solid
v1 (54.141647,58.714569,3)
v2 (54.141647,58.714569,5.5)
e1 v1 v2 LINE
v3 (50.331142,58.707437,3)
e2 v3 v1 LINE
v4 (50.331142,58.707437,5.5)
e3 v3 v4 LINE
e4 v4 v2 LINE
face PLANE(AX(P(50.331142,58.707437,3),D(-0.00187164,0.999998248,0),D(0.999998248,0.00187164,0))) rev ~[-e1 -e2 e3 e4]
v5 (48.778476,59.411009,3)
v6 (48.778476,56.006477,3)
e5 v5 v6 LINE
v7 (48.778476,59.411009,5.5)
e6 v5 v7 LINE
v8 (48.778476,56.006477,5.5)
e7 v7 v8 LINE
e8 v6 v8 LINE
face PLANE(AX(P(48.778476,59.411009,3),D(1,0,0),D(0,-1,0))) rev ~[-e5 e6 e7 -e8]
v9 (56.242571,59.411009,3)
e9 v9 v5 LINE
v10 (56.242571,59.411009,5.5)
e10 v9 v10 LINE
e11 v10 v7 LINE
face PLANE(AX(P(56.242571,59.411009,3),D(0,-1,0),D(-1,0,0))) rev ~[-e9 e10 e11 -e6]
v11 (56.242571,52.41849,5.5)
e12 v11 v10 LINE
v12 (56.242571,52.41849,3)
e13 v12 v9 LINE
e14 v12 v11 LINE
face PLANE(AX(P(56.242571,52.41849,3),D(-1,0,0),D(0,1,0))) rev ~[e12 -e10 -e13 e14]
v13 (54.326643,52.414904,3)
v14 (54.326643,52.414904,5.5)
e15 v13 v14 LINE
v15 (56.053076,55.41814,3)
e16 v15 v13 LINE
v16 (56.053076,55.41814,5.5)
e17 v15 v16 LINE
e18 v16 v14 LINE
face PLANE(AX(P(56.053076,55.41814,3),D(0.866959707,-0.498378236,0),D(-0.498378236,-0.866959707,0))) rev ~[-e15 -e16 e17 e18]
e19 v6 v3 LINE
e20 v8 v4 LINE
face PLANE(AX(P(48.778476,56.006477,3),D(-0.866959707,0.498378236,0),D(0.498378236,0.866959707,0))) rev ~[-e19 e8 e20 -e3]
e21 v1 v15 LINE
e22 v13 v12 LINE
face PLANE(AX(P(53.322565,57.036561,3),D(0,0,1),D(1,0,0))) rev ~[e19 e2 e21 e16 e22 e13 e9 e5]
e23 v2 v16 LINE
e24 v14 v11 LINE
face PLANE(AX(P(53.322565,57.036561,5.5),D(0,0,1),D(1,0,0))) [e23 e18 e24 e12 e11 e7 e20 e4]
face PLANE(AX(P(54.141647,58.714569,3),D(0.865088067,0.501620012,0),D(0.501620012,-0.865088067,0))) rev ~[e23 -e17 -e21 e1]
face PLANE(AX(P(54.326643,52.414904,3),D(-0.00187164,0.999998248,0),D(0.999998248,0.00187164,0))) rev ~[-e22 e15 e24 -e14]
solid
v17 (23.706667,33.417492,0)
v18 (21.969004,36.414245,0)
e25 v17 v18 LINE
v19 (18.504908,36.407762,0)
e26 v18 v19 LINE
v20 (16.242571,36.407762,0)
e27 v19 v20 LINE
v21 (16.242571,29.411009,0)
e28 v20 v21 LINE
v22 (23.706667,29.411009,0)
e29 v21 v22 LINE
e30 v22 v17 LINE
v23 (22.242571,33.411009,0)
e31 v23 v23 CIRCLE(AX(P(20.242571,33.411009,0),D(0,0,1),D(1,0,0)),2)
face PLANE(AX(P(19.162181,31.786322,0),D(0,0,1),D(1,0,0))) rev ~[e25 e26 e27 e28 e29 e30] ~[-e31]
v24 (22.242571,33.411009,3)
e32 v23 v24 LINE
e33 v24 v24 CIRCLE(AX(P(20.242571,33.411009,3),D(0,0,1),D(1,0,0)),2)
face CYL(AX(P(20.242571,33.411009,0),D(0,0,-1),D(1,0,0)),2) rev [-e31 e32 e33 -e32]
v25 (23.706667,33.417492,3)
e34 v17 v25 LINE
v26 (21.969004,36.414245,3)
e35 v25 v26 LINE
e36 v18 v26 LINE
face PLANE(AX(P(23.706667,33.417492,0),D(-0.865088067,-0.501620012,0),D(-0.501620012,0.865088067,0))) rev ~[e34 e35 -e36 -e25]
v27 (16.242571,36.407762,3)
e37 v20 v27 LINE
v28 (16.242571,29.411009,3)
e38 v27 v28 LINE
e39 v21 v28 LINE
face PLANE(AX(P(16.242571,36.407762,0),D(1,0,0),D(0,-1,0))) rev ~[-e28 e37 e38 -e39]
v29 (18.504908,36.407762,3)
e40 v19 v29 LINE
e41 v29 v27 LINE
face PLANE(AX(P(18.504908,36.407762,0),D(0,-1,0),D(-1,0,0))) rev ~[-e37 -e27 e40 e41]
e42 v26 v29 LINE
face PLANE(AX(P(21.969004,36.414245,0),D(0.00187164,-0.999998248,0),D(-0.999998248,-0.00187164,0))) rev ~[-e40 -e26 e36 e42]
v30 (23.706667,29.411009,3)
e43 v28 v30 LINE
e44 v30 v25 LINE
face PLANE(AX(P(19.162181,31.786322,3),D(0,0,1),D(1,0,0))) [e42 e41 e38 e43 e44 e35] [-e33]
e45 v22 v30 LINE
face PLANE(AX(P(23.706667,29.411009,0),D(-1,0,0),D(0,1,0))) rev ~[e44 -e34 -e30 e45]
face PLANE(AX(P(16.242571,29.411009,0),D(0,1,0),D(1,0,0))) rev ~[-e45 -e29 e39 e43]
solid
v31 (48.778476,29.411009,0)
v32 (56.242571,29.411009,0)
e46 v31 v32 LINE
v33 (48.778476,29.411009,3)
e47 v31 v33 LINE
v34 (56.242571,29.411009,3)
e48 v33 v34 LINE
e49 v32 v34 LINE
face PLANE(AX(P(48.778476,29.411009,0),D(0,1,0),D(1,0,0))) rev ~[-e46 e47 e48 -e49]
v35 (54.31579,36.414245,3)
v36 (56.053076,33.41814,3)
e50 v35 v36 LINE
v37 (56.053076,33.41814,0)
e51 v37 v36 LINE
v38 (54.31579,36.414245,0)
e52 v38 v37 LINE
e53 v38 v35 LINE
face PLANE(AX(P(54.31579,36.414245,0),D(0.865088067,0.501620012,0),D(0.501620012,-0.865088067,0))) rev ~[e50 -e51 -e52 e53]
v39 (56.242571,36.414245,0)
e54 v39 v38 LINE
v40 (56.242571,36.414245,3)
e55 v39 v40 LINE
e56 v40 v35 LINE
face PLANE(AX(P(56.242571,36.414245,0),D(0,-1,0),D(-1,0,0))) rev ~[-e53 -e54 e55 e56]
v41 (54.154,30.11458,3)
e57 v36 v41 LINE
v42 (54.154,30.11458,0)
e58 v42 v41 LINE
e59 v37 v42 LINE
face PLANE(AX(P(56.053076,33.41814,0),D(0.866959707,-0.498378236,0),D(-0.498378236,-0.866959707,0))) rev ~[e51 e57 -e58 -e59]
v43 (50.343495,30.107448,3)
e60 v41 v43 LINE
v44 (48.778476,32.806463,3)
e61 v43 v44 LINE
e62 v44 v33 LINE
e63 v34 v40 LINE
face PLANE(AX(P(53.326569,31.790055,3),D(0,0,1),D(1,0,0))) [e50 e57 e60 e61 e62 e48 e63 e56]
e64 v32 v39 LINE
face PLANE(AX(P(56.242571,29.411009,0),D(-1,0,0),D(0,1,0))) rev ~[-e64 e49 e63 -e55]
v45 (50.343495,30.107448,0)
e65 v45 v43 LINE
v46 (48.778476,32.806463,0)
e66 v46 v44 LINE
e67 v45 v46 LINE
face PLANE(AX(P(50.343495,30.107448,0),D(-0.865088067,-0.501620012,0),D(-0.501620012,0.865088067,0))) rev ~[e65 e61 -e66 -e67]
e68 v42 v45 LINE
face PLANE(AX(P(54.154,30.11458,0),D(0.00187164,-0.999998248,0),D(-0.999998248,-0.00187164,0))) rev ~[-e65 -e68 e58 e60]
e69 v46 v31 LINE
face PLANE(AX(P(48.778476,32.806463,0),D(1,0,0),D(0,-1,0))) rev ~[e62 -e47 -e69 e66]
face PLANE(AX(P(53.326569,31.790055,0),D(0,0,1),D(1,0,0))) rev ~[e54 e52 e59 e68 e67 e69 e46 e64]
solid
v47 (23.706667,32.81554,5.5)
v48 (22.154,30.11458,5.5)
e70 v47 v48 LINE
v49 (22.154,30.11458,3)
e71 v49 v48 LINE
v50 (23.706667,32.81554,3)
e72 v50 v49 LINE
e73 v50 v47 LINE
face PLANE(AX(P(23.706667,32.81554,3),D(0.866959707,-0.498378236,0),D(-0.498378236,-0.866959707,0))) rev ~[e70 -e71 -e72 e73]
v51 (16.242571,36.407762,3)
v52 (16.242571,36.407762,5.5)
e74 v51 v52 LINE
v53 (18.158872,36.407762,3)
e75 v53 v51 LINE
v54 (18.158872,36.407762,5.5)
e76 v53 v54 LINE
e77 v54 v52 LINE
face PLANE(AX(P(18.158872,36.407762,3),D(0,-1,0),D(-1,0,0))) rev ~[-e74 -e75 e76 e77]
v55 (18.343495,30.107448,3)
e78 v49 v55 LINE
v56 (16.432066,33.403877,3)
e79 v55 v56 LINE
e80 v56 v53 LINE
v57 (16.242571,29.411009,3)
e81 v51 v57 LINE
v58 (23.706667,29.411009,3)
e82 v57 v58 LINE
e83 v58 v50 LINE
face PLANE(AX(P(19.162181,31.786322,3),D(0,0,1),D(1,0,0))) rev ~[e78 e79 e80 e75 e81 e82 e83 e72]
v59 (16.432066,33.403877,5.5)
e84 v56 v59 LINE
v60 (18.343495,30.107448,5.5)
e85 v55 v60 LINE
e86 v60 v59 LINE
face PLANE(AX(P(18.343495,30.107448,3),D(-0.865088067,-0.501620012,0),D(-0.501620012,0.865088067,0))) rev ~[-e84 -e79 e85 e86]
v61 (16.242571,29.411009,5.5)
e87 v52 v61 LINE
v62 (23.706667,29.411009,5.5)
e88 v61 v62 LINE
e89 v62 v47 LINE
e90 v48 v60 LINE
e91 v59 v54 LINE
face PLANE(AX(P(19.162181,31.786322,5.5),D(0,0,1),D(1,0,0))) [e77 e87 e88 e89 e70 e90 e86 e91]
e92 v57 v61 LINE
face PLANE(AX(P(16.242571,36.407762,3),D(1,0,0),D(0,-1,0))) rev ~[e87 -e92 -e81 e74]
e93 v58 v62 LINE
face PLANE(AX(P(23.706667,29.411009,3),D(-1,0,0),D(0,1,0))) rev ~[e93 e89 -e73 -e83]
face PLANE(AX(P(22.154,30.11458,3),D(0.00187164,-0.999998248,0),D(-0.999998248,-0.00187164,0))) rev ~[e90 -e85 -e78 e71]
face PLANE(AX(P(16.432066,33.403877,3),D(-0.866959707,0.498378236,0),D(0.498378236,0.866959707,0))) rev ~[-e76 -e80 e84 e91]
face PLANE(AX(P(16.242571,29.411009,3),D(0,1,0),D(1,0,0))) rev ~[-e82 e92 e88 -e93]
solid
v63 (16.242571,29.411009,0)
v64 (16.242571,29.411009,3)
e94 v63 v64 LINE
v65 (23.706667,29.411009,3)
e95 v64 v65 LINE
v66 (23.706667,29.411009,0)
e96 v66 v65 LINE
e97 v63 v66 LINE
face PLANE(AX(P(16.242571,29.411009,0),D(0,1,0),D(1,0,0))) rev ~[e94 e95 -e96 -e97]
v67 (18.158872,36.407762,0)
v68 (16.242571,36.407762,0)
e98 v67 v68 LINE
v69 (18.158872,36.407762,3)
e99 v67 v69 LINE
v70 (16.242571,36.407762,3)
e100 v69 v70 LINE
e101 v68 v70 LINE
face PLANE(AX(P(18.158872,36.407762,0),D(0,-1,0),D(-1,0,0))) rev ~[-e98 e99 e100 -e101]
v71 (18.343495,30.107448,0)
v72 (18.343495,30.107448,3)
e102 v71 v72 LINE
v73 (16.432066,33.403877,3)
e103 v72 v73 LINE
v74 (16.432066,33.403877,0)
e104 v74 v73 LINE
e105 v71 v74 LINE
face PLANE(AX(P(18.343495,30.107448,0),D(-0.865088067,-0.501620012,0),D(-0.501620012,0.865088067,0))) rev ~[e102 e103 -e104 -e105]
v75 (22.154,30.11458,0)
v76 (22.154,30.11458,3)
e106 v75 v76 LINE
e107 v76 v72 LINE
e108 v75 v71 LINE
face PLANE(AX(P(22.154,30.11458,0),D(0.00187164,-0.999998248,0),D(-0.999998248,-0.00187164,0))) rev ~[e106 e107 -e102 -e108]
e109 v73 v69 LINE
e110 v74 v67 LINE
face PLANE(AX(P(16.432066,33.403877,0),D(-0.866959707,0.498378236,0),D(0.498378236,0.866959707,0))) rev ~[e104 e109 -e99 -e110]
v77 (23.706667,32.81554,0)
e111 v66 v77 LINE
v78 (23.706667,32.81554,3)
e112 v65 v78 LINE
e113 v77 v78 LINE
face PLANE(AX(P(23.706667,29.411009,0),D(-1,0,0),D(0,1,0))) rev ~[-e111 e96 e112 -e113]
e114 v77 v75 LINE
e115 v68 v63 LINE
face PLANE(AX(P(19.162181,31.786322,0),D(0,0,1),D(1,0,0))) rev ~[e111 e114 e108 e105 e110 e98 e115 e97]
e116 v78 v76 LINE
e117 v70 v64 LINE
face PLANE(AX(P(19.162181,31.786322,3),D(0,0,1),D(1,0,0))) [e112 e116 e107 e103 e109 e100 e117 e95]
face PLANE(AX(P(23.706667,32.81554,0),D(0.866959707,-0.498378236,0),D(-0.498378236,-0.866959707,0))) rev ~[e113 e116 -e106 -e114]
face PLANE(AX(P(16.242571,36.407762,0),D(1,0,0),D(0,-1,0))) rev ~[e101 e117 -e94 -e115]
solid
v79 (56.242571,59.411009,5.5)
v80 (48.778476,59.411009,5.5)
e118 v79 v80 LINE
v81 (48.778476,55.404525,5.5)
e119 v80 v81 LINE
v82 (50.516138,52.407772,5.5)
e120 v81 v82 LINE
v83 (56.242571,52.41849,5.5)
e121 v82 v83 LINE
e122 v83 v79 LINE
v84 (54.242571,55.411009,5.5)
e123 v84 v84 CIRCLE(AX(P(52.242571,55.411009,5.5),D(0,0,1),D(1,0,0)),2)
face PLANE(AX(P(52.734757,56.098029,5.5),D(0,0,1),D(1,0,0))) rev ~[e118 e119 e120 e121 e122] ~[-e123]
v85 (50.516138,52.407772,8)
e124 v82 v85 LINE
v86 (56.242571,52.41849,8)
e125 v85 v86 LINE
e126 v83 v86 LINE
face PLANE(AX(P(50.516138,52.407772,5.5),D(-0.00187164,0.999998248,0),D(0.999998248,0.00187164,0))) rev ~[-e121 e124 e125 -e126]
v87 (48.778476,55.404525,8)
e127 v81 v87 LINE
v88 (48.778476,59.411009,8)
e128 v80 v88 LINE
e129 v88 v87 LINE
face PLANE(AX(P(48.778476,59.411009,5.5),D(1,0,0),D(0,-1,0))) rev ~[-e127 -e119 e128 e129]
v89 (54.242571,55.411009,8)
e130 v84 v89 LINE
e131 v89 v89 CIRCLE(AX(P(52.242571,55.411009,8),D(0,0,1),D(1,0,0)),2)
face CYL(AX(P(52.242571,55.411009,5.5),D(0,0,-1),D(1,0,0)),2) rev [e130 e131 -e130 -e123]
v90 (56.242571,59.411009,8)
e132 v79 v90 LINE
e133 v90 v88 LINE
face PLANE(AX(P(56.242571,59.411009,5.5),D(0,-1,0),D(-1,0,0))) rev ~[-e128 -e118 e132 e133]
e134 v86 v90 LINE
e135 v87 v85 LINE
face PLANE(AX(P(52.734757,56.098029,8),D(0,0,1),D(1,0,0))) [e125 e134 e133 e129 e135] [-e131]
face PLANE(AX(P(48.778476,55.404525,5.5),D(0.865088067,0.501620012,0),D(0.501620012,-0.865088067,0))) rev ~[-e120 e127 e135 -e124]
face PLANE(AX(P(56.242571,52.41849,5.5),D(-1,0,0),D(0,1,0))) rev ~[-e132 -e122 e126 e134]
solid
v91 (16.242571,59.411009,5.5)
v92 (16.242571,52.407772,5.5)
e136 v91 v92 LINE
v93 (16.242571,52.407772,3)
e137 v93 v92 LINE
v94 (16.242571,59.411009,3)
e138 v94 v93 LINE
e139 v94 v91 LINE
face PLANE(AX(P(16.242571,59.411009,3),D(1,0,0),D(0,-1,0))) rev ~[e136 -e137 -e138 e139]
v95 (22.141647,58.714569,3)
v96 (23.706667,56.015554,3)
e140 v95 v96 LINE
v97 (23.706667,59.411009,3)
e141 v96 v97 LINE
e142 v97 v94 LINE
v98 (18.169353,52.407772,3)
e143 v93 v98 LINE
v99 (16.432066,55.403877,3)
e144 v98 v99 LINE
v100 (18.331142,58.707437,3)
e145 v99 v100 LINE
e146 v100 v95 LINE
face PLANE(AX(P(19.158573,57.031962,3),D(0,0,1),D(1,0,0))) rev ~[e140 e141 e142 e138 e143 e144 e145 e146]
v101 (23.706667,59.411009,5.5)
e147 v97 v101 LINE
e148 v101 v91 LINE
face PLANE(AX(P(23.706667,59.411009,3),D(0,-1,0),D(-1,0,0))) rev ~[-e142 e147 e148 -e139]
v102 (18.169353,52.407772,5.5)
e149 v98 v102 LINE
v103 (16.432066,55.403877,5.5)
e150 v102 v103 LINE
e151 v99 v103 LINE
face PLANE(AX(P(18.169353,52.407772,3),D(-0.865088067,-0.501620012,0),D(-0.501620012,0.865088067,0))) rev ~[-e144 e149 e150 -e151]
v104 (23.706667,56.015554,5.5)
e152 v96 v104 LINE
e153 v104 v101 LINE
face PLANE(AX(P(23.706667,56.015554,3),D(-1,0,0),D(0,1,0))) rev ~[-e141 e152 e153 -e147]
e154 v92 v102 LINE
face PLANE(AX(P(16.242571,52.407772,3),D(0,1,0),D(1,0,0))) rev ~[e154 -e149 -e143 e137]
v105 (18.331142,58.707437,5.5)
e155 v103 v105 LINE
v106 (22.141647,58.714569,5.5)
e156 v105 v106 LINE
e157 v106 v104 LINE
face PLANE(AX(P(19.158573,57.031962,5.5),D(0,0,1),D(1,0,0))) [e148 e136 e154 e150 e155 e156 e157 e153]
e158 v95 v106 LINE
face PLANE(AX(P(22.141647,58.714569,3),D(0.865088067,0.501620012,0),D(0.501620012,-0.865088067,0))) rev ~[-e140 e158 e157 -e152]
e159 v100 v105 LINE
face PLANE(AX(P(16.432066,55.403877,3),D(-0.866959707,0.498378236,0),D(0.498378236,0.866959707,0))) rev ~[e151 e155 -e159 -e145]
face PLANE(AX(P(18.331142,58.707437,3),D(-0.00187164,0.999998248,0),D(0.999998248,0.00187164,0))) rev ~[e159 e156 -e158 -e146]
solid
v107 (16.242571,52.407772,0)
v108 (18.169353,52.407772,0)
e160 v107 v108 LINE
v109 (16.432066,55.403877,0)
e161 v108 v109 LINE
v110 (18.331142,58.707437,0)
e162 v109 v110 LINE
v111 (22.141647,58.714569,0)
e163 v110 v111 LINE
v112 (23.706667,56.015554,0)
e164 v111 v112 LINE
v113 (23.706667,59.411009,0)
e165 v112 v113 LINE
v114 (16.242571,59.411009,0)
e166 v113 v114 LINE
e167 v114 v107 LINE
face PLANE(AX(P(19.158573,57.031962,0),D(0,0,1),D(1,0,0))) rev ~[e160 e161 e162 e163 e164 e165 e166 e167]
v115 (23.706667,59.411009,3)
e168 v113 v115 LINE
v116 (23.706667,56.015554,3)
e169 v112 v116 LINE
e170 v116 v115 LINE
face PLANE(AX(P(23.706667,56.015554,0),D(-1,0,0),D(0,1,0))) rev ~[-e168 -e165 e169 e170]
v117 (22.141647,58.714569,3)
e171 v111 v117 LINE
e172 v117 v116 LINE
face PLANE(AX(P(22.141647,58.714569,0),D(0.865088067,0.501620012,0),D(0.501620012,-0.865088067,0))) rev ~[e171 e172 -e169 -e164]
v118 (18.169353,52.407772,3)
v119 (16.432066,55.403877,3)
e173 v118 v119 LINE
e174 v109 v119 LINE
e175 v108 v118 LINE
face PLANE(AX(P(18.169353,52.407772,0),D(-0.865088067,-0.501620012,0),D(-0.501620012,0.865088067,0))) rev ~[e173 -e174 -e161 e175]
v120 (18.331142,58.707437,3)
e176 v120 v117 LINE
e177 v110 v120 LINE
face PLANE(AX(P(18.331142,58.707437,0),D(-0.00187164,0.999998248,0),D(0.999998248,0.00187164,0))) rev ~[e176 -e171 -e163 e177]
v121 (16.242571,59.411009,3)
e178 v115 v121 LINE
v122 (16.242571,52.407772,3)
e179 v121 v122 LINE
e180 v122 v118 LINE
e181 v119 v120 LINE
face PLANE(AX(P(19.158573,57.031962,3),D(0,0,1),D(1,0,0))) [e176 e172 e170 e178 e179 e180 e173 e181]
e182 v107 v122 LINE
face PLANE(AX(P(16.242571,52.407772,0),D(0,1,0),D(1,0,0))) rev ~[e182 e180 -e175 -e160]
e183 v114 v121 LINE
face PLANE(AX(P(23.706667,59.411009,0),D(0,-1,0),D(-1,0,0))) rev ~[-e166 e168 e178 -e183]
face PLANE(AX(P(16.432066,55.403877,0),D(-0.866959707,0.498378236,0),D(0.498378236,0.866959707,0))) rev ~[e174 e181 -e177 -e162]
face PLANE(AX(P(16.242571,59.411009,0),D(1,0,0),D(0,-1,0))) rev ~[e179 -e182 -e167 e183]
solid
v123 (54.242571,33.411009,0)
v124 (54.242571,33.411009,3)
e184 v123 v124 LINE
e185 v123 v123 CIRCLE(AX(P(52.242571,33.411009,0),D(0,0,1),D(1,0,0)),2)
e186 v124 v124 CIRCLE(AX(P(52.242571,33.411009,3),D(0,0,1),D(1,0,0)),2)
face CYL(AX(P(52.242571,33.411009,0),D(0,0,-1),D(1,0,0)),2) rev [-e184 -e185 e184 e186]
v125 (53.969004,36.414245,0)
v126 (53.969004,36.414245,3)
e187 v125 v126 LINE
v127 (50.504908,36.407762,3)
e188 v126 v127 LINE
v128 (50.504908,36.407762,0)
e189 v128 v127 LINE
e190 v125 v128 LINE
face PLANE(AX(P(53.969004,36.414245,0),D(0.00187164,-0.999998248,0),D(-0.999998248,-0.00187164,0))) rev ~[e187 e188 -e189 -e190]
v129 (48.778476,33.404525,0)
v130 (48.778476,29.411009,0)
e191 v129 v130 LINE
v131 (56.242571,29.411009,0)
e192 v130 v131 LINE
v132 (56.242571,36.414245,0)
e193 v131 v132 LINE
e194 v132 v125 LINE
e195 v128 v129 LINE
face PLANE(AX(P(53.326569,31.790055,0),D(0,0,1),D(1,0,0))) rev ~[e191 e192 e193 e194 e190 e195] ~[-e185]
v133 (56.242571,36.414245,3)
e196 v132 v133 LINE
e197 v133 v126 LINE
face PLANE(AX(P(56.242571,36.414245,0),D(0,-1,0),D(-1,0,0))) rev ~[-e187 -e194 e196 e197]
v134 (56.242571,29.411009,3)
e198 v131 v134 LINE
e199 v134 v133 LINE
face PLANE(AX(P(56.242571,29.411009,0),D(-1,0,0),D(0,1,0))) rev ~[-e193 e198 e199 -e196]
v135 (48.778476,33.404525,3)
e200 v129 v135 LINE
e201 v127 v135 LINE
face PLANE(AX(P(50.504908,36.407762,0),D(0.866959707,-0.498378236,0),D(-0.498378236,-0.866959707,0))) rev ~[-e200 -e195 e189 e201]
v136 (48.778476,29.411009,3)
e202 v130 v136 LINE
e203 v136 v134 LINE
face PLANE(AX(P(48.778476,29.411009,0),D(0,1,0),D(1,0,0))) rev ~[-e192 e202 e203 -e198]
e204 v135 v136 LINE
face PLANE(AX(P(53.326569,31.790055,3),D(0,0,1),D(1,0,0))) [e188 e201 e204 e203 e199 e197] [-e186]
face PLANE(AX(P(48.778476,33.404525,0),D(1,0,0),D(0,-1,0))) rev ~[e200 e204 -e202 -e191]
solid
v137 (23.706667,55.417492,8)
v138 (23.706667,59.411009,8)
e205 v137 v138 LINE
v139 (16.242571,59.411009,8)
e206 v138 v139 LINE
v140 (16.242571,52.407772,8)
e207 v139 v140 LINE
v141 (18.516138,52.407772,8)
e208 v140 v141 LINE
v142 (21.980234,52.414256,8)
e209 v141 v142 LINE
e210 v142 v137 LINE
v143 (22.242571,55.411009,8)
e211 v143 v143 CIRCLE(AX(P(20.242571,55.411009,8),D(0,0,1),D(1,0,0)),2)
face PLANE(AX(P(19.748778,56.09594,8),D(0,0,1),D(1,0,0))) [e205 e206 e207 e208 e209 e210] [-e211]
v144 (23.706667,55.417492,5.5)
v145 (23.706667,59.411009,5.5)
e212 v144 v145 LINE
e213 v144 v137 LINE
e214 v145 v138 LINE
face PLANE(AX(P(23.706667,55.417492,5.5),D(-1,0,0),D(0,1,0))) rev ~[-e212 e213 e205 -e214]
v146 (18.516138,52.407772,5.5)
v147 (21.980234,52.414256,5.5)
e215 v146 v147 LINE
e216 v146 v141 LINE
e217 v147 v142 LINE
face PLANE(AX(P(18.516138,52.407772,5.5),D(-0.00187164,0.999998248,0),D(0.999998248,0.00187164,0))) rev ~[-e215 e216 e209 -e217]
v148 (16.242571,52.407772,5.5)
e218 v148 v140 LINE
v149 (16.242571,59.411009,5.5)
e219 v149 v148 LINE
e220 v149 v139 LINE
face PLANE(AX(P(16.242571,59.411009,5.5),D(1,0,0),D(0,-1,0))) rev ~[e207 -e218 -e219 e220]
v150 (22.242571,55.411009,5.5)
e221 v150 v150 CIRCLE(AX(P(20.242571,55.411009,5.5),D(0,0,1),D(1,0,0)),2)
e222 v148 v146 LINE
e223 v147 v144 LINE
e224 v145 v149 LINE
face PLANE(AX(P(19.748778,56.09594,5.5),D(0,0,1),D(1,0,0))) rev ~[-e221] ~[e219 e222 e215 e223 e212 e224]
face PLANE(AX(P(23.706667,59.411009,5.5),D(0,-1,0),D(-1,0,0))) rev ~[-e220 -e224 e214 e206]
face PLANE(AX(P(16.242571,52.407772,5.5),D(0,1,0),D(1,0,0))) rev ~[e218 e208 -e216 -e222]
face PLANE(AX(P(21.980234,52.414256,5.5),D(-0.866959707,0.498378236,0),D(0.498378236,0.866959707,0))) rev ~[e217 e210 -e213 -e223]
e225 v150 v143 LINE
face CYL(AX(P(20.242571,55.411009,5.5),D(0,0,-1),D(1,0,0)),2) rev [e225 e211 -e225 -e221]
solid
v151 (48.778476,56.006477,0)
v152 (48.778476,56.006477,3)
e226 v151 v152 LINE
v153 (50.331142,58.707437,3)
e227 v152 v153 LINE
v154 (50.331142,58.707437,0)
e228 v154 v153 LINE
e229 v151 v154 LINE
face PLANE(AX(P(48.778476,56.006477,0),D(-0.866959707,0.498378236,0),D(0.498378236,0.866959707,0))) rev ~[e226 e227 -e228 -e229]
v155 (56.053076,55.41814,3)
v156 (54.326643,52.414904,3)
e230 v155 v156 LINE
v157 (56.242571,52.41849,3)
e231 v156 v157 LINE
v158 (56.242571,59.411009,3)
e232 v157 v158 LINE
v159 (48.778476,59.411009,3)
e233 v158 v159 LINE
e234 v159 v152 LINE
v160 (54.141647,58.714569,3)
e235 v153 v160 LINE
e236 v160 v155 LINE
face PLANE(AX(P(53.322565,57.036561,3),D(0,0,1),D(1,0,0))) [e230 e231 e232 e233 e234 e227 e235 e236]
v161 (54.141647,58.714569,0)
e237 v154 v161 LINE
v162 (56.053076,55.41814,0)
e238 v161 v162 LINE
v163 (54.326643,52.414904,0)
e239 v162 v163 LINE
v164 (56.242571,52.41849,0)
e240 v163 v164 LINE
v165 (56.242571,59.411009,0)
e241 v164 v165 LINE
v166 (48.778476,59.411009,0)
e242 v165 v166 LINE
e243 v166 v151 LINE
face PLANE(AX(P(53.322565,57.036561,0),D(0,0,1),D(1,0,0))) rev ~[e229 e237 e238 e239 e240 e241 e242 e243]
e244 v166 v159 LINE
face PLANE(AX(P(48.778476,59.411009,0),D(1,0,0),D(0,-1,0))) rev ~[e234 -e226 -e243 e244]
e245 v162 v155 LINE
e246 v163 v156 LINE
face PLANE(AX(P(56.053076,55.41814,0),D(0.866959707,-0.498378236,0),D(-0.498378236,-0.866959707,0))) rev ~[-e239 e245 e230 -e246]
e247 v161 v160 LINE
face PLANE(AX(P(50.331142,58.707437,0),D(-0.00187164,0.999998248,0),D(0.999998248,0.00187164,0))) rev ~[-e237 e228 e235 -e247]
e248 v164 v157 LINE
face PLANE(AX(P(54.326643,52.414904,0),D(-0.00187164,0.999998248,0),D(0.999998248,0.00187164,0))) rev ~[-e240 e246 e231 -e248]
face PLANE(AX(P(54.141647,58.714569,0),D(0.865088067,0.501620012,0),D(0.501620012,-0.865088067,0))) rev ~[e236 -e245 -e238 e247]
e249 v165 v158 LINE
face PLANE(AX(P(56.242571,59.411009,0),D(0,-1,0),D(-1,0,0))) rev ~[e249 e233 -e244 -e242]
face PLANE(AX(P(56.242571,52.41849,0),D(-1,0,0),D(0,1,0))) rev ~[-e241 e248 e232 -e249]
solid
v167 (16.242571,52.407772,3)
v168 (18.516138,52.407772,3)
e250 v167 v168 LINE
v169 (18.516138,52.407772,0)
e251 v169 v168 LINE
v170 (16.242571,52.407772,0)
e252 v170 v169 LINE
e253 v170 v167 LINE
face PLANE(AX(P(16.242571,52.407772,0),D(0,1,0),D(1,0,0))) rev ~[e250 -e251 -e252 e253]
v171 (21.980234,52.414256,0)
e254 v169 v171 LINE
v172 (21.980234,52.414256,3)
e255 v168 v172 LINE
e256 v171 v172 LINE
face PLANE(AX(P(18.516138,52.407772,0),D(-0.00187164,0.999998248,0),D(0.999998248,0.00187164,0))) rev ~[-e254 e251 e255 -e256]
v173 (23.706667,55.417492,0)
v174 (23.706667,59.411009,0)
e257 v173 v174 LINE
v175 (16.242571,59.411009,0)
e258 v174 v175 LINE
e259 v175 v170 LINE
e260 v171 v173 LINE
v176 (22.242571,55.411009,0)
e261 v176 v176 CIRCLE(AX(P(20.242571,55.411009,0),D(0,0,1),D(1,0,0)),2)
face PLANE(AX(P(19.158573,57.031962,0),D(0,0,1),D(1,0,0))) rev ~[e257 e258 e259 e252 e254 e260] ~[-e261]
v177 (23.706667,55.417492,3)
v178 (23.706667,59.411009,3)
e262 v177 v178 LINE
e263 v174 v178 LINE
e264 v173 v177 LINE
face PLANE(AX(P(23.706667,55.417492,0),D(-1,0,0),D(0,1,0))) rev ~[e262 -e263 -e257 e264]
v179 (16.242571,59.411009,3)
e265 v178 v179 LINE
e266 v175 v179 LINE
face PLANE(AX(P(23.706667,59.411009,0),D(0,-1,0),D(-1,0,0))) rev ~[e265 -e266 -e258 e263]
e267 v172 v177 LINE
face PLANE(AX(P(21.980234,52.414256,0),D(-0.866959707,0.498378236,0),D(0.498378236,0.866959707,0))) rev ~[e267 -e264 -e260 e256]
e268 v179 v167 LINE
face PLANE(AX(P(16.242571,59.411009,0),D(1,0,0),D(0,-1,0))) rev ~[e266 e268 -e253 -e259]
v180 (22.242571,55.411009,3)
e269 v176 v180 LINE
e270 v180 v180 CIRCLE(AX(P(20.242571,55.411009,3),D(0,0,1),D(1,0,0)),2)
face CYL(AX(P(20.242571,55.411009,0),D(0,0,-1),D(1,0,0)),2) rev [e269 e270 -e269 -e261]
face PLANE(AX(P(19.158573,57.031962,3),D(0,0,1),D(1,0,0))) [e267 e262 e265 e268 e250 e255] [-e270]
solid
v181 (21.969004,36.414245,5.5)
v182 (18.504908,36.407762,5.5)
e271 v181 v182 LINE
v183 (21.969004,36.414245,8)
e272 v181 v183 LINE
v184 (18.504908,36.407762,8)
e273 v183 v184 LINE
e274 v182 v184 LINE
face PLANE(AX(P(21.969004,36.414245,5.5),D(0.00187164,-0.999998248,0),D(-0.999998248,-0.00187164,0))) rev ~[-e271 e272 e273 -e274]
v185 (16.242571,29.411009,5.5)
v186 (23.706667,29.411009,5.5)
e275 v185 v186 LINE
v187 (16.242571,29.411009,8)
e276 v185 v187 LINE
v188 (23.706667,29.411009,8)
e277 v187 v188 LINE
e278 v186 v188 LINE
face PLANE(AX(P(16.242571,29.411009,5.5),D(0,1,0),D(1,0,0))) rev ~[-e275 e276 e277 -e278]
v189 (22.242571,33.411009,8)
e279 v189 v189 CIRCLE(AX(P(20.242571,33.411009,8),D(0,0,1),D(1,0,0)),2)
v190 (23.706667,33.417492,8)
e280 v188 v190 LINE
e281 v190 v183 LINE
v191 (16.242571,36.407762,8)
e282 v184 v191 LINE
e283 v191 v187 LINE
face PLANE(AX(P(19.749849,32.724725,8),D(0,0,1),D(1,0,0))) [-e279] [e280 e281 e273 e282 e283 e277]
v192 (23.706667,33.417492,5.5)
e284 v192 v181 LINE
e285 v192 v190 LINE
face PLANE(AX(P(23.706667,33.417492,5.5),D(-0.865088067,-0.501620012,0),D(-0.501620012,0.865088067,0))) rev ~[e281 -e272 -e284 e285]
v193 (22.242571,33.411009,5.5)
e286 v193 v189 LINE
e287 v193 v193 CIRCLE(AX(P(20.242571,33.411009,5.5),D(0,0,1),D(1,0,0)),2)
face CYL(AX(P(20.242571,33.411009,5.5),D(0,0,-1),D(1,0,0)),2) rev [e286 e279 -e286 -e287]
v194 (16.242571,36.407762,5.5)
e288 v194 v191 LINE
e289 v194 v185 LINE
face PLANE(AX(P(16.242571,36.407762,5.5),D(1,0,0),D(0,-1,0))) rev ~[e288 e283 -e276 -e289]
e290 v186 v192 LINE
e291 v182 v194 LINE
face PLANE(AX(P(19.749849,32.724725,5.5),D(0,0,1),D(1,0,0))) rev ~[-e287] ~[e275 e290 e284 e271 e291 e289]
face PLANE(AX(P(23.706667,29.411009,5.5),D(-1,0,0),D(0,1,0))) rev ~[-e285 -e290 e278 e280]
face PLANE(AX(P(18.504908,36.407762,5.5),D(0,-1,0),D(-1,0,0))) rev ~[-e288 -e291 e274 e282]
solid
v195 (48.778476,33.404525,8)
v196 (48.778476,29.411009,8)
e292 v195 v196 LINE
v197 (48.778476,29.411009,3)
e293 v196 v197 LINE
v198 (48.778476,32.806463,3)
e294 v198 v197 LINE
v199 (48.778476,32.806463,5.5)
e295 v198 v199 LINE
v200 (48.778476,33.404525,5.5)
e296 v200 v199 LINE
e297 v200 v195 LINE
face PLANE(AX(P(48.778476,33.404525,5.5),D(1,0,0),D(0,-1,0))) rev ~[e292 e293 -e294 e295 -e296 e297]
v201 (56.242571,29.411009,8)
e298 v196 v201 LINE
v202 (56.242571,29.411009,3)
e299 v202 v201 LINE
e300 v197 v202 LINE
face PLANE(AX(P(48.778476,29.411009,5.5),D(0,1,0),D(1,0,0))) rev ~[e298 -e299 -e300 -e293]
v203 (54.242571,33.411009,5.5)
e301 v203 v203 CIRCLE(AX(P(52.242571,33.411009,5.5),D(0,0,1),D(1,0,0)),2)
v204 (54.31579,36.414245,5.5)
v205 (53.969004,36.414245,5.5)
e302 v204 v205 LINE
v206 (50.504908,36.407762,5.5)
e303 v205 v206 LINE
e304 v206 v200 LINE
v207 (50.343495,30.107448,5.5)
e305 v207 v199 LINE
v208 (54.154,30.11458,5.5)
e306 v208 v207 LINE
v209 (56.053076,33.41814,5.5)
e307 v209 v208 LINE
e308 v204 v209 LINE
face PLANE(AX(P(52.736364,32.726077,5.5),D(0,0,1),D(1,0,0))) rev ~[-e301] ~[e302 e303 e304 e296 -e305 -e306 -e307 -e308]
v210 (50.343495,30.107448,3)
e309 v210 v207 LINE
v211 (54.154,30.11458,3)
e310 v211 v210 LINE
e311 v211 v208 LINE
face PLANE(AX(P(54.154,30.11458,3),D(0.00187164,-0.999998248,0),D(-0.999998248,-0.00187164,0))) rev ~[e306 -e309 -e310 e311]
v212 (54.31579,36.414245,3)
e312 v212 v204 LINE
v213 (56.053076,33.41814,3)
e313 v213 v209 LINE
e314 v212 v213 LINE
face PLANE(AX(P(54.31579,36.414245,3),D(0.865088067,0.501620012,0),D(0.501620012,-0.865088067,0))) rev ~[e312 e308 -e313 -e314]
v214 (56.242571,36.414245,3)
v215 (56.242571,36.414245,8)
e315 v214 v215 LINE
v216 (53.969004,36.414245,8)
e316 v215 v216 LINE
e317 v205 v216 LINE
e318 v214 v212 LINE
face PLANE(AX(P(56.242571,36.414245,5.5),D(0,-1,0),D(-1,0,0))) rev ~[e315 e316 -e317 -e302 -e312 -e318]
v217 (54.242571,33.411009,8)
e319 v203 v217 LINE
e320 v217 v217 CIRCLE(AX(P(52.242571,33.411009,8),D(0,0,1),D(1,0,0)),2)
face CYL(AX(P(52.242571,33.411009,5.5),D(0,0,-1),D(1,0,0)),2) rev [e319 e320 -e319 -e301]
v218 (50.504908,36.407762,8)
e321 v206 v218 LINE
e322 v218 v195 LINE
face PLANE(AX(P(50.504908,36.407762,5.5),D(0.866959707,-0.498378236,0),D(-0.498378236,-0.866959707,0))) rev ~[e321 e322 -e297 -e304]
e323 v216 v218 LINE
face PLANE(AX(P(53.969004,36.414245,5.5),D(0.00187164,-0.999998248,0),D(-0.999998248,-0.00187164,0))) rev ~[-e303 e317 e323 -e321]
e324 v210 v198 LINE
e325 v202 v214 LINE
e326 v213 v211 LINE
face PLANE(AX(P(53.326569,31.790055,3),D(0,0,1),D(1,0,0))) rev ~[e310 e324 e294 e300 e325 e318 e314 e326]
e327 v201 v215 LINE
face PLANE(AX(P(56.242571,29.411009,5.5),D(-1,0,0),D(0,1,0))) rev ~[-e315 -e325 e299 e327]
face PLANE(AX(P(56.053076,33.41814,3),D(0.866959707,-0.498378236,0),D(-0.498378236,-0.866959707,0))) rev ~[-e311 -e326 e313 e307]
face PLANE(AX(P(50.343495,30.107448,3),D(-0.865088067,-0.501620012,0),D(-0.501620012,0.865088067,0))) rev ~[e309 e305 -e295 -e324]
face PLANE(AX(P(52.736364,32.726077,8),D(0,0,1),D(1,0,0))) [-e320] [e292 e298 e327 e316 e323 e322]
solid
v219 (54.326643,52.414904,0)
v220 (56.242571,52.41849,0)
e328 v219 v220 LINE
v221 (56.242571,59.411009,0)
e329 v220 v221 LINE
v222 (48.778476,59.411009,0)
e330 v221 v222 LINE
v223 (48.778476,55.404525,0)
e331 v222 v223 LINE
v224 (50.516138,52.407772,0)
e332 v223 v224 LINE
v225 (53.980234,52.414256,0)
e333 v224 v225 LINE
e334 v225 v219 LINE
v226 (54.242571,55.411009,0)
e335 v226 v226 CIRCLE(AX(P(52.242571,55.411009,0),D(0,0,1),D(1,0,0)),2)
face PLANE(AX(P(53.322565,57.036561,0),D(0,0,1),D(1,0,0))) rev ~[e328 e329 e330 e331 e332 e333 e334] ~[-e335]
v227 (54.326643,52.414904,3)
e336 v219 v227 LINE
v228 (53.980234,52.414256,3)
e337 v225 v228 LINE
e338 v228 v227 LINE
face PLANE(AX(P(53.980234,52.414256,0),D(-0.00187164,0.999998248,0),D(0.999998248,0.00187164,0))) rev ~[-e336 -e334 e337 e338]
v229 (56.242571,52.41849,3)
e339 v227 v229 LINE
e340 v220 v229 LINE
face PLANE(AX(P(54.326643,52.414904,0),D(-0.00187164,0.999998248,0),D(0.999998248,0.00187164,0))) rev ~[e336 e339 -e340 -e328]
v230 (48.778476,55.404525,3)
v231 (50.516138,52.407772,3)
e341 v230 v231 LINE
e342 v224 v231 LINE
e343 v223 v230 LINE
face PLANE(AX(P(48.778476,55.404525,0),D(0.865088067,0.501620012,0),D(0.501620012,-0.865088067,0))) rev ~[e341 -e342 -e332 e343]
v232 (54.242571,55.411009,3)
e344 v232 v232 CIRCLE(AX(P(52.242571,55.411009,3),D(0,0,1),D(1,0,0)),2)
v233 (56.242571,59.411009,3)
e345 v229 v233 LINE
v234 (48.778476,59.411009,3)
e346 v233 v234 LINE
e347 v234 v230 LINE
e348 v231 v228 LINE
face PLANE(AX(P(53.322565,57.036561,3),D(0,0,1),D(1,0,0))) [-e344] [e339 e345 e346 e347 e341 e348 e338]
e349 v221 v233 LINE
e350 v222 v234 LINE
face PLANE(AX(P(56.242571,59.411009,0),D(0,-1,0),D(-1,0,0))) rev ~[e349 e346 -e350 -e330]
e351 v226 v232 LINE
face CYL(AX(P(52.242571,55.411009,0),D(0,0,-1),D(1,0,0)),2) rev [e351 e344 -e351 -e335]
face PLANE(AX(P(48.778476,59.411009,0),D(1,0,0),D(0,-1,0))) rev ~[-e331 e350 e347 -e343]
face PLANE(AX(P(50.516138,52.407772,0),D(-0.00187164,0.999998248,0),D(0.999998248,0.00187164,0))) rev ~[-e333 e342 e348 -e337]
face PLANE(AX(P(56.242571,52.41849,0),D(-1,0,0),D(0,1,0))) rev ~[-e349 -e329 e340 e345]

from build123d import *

# Parameters (mm, degrees)
F0_R      = 2
F1_DEPTH  = 3
F2_DEPTH  = 3
F3_DEPTH  = 2.5
F4_START  = 2.5
F1_FACE_R = 2
F4_DEPTH  = 2.5


with BuildPart() as f1:
    # F0 (on Top) → F1 (new body)
    with BuildSketch(Plane.XY):
        Polygon((56.2425711751, 29.4110085815), (56.2425711751, 36.414245103), (54.3157895307, 36.414245103), (56.0530762776, 33.4181404888), (54.1540001392, 30.1145803152), (50.3434950368, 30.1074484079), (48.7784756274, 32.8064627658), (48.7784756274, 29.4110085815), align=None)
        Polygon((56.0530762776, 33.4181404888), (54.3157895307, 36.414245103), (53.9690040281, 36.414245103), (50.5049084804, 36.4077615509), (48.7784756274, 33.4045250294), (48.7784756274, 32.8064627658), (50.3434950368, 30.1074484079), (54.1540001392, 30.1145803152), align=None)
        with Locations((52.2425711751, 33.4110085815)):
            Circle(F0_R, mode=Mode.SUBTRACT)
    extrude(amount=F1_DEPTH)


with BuildPart() as f1b:
    # F0 (on Top) → F1, piece 2 (new body)
    with BuildSketch(Plane.XY):
        Polygon((18.1588716375, 36.4077615509), (16.2425711751, 36.4077615509), (16.2425711751, 29.4110085815), (23.7066667228, 29.4110085815), (23.7066667228, 32.8155396842), (22.1540001392, 30.1145803152), (18.3434950368, 30.1074484079), (16.4320660726, 33.4038766742), align=None)
        Polygon((18.5049084804, 36.4077615509), (18.1588716375, 36.4077615509), (16.4320660726, 33.4038766742), (18.3434950368, 30.1074484079), (22.1540001392, 30.1145803152), (23.7066667228, 32.8155396842), (23.7066667228, 33.4174921336), (21.9690040281, 36.414245103), align=None)
        with Locations((20.2425711751, 33.4110085815)):
            Circle(F0_R, mode=Mode.SUBTRACT)
    extrude(amount=F1_DEPTH)


with BuildPart() as f1c:
    # F0 (on Top) → F1, piece 3 (new body)
    with BuildSketch(Plane.XY):
        Polygon((23.7066667228, 59.4110085815), (16.2425711751, 59.4110085815), (16.2425711751, 52.40777206), (18.1693528195, 52.40777206), (16.4320660726, 55.4038766742), (18.331142211, 58.7074368479), (22.1416473134, 58.7145687551), (23.7066667228, 56.0155543972), align=None)
        Polygon((23.7066667228, 55.4174921336), (23.7066667228, 56.0155543972), (22.1416473134, 58.7145687551), (18.331142211, 58.7074368479), (16.4320660726, 55.4038766742), (18.1693528195, 52.40777206), (18.5161383221, 52.40777206), (21.9802338698, 52.4142556121), align=None)
        with Locations((20.2425711751, 55.4110085815)):
            Circle(F0_R, mode=Mode.SUBTRACT)
    extrude(amount=F1_DEPTH)


with BuildPart() as f1d:
    # F0 (on Top) → F1, piece 4 (new body)
    with BuildSketch(Plane.XY):
        Polygon((56.2425711751, 59.4110085815), (48.7784756274, 59.4110085815), (48.7784756274, 56.0064774788), (50.331142211, 58.7074368479), (54.1416473134, 58.7145687551), (56.0530762776, 55.4181404888), (54.3266434245, 52.4149039673), (56.2425711751, 52.4184899011), align=None)
        Polygon((50.331142211, 58.7074368479), (48.7784756274, 56.0064774788), (48.7784756274, 55.4045250294), (50.5161383221, 52.40777206), (53.9802338698, 52.4142556121), (54.3266434245, 52.4149039673), (56.0530762776, 55.4181404888), (54.1416473134, 58.7145687551), align=None)
        with Locations((52.2425711751, 55.4110085815)):
            Circle(F0_R, mode=Mode.SUBTRACT)
    extrude(amount=F1_DEPTH)


with BuildPart() as f2:
    # F0 (on Top) → F2 (new body, through all)
    with BuildSketch(Plane.XY):
        Polygon((56.2425711751, 29.4110085815), (56.2425711751, 36.414245103), (54.3157895307, 36.414245103), (56.0530762776, 33.4181404888), (54.1540001392, 30.1145803152), (50.3434950368, 30.1074484079), (48.7784756274, 32.8064627658), (48.7784756274, 29.4110085815), align=None)
    extrude(amount=F2_DEPTH)


with BuildPart() as f2b:
    # F0 (on Top) → F2, piece 2 (new body, through all)
    with BuildSketch(Plane.XY):
        Polygon((56.2425711751, 59.4110085815), (48.7784756274, 59.4110085815), (48.7784756274, 56.0064774788), (50.331142211, 58.7074368479), (54.1416473134, 58.7145687551), (56.0530762776, 55.4181404888), (54.3266434245, 52.4149039673), (56.2425711751, 52.4184899011), align=None)
    extrude(amount=F2_DEPTH)


with BuildPart() as f2c:
    # F0 (on Top) → F2, piece 3 (new body, through all)
    with BuildSketch(Plane.XY):
        Polygon((23.7066667228, 59.4110085815), (16.2425711751, 59.4110085815), (16.2425711751, 52.40777206), (18.1693528195, 52.40777206), (16.4320660726, 55.4038766742), (18.331142211, 58.7074368479), (22.1416473134, 58.7145687551), (23.7066667228, 56.0155543972), align=None)
    extrude(amount=F2_DEPTH)


with BuildPart() as f2d:
    # F0 (on Top) → F2, piece 4 (new body, through all)
    with BuildSketch(Plane.XY):
        Polygon((18.1588716375, 36.4077615509), (16.2425711751, 36.4077615509), (16.2425711751, 29.4110085815), (23.7066667228, 29.4110085815), (23.7066667228, 32.8155396842), (22.1540001392, 30.1145803152), (18.3434950368, 30.1074484079), (16.4320660726, 33.4038766742), align=None)
    extrude(amount=F2_DEPTH)


with BuildPart() as f3:
    # F3 (new): a face of the model
    f3_faces = [f2.part.faces().sort_by_distance(p)[0] for p in [
        (52.5105234013, 29.5133599587, 3),
    ]]
    extrude(f3_faces, amount=F3_DEPTH)

    # F1_face (on face) → F4 (join)
    with BuildSketch(Plane(origin=(52.8230493213, 32.5673462874, 3), x_dir=(1, 0, 0), z_dir=(0, 0, 1)).offset(F4_START)):
        Polygon((-4.0445736939, -3.1563377059), (3.4195218538, -3.1563377059), (3.4195218538, 3.8468988156), (1.1459547068, 3.8468988156), (-2.3181408409, 3.8404152635), (-4.0445736939, 0.837178742), align=None)
        with Locations((-0.5804781462, 0.8436622941)):
            Circle(F1_FACE_R, mode=Mode.SUBTRACT)
    extrude(amount=F4_DEPTH)


with BuildPart() as f3b:
    # F3#2 (new): a face of the model
    f3_2_faces = [f2d.part.faces().sort_by_distance(p)[0] for p in [
        (17.2067727863, 34.9568067074, 3),
    ]]
    extrude(f3_2_faces, amount=F3_DEPTH)


with BuildPart() as f3c:
    # F3#3 (new): a face of the model
    f3_3_faces = [f2c.part.faces().sort_by_distance(p)[0] for p in [
        (19.9746189489, 59.3086572043, 3),
    ]]
    extrude(f3_3_faces, amount=F3_DEPTH)


with BuildPart() as f3d:
    # F3#4 (new): a face of the model
    f3_4_faces = [f2b.part.faces().sort_by_distance(p)[0] for p in [
        (52.5105234013, 59.3087059901, 3),
    ]]
    extrude(f3_4_faces, amount=F3_DEPTH)


with BuildPart() as f4:
    # F1_face (on face) → F4, piece 2 (new body)
    with BuildSketch(Plane(origin=(52.8230493213, 32.5673462874, 3), x_dir=(1, 0, 0), z_dir=(0, 0, 1)).offset(F4_START)):
        Polygon((-36.5804781462, 3.8404152635), (-36.5804781462, -3.1563377059), (-29.1163825985, -3.1563377059), (-29.1163825985, 0.8501458462), (-30.8540452932, 3.8468988156), (-34.3181408409, 3.8404152635), align=None)
        with Locations((-32.5804781462, 0.8436622941)):
            Circle(F1_FACE_R, mode=Mode.SUBTRACT)
    extrude(amount=F4_DEPTH)


with BuildPart() as f4b:
    # F1_face (on face) → F4, piece 3 (new body)
    with BuildSketch(Plane(origin=(52.8230493213, 32.5673462874, 3), x_dir=(1, 0, 0), z_dir=(0, 0, 1)).offset(F4_START)):
        Polygon((-29.1163825985, 26.8436622941), (-36.5804781462, 26.8436622941), (-36.5804781462, 19.8404257726), (-34.3069109992, 19.8404257726), (-30.8428154515, 19.8469093247), (-29.1163825985, 22.8501458462), align=None)
        with Locations((-32.5804781462, 22.8436622941)):
            Circle(F1_FACE_R, mode=Mode.SUBTRACT)
    extrude(amount=F4_DEPTH)


with BuildPart() as f4c:
    # F1_face (on face) → F4, piece 4 (new body)
    with BuildSketch(Plane(origin=(52.8230493213, 32.5673462874, 3), x_dir=(1, 0, 0), z_dir=(0, 0, 1)).offset(F4_START)):
        Polygon((3.4195218538, 26.8436622941), (-4.0445736939, 26.8436622941), (-4.0445736939, 22.837178742), (-2.3069109992, 19.8404257726), (3.4195218538, 19.8511436137), align=None)
        with Locations((-0.5804781462, 22.8436622941)):
            Circle(F1_FACE_R, mode=Mode.SUBTRACT)
    extrude(amount=F4_DEPTH)


solid = Compound([f1.part, f1b.part, f1c.part, f1d.part, f2.part, f2b.part, f2c.part, f2d.part, f3.part, f3b.part, f3c.part, f3d.part, f4.part, f4b.part, f4c.part])
